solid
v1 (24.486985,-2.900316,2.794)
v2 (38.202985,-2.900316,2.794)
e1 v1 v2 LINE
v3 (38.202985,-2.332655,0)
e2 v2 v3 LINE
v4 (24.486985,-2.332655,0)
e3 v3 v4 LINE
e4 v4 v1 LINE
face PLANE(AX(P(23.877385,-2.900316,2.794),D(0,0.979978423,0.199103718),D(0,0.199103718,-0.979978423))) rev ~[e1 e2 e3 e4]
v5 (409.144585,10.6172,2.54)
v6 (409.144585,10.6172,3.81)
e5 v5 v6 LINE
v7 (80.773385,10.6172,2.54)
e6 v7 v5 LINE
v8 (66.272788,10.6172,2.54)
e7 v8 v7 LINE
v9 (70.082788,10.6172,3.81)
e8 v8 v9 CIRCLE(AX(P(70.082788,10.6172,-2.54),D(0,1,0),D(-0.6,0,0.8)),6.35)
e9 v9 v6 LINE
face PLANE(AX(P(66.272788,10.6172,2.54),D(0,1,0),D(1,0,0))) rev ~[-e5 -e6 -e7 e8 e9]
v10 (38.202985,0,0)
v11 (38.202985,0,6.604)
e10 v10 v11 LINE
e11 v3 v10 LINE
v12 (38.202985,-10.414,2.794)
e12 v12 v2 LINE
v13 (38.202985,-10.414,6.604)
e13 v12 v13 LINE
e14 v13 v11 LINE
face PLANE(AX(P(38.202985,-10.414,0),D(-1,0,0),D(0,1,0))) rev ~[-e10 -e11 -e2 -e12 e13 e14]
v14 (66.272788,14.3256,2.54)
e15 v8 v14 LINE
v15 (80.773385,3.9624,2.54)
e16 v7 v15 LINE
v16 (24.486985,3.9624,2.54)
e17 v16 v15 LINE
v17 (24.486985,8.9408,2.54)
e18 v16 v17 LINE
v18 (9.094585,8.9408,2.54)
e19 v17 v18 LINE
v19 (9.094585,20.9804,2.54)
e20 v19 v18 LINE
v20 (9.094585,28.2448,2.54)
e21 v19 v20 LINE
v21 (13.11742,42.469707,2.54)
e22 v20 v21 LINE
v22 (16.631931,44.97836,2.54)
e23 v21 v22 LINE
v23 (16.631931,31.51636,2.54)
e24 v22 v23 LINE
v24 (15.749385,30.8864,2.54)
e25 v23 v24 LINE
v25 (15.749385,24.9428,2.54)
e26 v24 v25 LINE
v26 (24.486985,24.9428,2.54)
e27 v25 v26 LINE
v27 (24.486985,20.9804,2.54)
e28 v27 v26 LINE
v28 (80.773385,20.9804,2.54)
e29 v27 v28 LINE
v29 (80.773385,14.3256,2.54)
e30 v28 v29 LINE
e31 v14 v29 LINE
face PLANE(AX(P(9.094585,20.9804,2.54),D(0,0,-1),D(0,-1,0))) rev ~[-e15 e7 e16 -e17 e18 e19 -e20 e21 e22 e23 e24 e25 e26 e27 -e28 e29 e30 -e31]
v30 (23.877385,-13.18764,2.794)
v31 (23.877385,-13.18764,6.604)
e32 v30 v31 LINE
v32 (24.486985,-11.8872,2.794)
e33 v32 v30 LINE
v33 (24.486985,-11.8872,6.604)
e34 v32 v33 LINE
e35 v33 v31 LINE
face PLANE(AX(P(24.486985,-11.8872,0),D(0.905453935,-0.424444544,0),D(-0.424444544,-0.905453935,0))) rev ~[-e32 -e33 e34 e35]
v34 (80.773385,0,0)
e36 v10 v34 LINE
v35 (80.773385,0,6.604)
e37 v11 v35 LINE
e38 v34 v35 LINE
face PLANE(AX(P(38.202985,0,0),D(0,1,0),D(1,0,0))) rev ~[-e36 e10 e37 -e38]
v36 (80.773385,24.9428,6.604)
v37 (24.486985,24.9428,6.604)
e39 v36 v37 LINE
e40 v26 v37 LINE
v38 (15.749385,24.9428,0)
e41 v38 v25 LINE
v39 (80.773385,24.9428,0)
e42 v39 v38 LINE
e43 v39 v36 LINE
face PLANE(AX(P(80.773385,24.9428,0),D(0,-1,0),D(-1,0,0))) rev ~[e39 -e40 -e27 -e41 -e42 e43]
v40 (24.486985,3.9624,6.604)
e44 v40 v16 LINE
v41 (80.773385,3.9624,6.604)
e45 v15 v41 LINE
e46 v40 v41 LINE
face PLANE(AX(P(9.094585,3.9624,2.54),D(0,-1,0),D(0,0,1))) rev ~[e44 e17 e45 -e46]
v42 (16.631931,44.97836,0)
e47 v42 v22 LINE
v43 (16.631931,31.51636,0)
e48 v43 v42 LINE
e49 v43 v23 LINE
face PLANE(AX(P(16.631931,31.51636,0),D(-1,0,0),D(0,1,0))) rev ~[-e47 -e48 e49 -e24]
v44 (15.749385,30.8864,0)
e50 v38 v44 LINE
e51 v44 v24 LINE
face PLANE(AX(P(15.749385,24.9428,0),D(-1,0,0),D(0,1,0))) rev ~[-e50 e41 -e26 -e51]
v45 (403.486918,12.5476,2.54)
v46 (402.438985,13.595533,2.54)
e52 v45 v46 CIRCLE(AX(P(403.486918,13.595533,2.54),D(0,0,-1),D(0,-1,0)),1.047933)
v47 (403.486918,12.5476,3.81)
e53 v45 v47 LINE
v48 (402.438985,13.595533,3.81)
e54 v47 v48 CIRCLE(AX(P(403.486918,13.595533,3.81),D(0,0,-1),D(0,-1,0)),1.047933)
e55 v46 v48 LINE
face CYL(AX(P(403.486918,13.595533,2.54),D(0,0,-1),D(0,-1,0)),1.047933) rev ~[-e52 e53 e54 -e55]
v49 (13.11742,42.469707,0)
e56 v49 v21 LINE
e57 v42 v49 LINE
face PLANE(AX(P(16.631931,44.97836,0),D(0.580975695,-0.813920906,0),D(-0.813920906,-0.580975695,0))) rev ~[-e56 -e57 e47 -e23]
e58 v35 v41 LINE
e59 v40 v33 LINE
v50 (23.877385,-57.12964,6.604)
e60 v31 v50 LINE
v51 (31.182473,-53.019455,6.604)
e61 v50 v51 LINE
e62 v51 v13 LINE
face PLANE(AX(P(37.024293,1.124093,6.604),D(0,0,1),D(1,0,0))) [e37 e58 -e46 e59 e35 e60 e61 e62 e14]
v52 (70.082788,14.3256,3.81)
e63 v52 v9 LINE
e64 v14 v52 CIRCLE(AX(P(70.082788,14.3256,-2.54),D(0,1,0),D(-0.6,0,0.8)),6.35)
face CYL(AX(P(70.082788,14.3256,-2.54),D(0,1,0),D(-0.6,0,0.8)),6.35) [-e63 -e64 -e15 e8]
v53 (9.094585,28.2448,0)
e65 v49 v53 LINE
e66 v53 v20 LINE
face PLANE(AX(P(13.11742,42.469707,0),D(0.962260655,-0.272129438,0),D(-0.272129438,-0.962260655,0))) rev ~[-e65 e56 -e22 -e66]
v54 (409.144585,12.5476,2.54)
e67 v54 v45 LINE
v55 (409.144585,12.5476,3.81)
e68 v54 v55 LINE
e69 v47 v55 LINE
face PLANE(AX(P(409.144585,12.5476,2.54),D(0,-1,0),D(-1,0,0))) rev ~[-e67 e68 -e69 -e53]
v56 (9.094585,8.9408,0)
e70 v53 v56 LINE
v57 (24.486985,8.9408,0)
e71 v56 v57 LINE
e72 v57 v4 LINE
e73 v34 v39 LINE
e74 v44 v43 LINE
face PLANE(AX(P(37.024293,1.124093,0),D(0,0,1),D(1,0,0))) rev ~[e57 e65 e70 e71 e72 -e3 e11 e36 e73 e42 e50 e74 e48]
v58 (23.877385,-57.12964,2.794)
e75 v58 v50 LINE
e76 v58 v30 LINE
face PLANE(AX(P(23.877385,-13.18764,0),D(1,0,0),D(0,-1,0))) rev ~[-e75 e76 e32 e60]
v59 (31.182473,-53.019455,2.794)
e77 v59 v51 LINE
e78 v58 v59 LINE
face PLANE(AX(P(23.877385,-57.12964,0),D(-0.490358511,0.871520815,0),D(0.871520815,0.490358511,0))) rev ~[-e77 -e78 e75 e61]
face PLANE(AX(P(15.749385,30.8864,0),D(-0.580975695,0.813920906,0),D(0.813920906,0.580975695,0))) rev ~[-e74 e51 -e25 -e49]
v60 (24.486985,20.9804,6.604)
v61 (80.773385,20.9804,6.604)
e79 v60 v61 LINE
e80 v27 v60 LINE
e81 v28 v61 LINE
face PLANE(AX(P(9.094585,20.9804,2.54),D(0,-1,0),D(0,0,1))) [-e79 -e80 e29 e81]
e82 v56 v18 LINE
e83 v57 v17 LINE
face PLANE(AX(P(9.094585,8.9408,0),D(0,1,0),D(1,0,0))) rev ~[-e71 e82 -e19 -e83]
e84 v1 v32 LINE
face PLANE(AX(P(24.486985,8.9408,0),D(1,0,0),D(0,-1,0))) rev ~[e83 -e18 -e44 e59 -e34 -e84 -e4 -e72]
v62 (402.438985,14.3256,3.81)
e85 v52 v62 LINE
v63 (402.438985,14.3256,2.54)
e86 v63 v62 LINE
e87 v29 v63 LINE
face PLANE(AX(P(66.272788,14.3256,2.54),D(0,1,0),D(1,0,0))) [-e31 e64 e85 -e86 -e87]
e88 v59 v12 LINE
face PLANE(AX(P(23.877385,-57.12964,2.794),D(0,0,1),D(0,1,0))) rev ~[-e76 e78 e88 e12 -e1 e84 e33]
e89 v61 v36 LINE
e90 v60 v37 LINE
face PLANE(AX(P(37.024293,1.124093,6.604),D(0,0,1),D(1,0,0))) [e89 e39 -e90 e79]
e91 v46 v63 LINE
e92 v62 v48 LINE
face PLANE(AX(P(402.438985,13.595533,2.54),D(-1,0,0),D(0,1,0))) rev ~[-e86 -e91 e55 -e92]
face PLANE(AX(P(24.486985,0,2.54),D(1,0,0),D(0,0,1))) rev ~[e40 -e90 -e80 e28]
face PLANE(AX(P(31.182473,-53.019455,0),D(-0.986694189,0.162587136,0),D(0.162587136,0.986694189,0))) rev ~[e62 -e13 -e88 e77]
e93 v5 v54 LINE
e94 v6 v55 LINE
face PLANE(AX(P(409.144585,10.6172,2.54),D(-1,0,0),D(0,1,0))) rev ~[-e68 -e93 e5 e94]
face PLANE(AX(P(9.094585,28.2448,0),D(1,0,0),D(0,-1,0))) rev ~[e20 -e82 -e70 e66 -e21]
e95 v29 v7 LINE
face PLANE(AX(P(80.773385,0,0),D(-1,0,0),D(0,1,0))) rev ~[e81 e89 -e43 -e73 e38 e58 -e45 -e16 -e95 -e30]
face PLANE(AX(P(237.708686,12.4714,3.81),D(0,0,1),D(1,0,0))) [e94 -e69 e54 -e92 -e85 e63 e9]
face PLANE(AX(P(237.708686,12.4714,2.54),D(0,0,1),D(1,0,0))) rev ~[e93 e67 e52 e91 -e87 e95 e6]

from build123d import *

# Parameters (mm, degrees)
F2_DEPTH     = 6.604
F4_W         = 17.018
F4_H         = 5.5950877881
F5_DEPTH     = 71.6798
F6_W         = 16.355678454
F6_H         = 4.3095059386
F7_DEPTH     = 44.9793598678
F9_DEPTH     = 56.897
F10_W        = 342.8717973226
F10_H        = 3.7084
F11_DEPTH    = 1.27
F12_T1_DEPTH = 3.7084
F14_DEPTH    = 4.065


# Not quite as in the source:
# - a fillet or chamfer that OpenCascade refuses, or shapes differently, is made with other operations: its cross-section is extruded or revolved along the edge and cut away or added


with BuildPart() as f2:
    # F1 (on Top) → F2 (new body)
    with BuildSketch(Plane.XY):
        Polygon((80.7733850724, 0), (80.7733850724, 24.9428), (15.7493850724, 24.9428), (15.7493850724, 30.8864), (16.6319306082, 31.5163598678), (16.6319306082, 44.9783598678), (13.1174201358, 42.4697068149), (9.0945850724, 28.2448), (9.0945850724, 8.9408), (24.4869850724, 8.9408), (24.4869850724, -11.8872), (23.8773850724, -13.1876401322), (23.8773850724, -57.1296401322), (31.1824725433, -53.0194550947), (38.2029850724, -10.414), (38.2029850724, 0), align=None)
    extrude(amount=F2_DEPTH)

    # F4 (on face) → F5 (cut, through all)
    with BuildSketch(Plane(origin=(9.0945850724, 0, 0), x_dir=(0, -1, 0), z_dir=(-1, 0, 0))):
        with Locations((-12.4714, 5.3375438941)):
            Rectangle(F4_W, F4_H)
    extrude(amount=-F5_DEPTH, mode=Mode.SUBTRACT)

    # F6 (on Front) → F7 (cut, through all)
    with BuildSketch(Plane.XZ):
        with Locations((16.3091458454, 4.6947529693)):
            Rectangle(F6_W, F6_H)
    extrude(amount=-F7_DEPTH, mode=Mode.SUBTRACT)

    # F8 (on face) → F9 (cut, through all)
    with BuildSketch(Plane(origin=(23.8773850724, 0, 0), x_dir=(0, -1, 0), z_dir=(-1, 0, 0))):
        Polygon((57.1296401322, -1.4798081247), (57.1296401322, 2.794), (2.9003161471, 2.794), (2.032, -1.4798081247), align=None)
    extrude(amount=-F9_DEPTH, mode=Mode.SUBTRACT)

    # F10 (on face) → F11 (join)
    with BuildSketch(Plane.XY.offset(2.54)):
        with Locations((237.7086864111, 12.4714)):
            Rectangle(F10_W, F10_H)
    extrude(amount=F11_DEPTH)

    # F12: fillet of radius 6.35 on 1 edges, made by hand

    # F12_s2 → F12_t1 (cut)
    with BuildSketch(Plane.XZ.offset(-14.3256)):
        with BuildLine():
            ThreePointArc((66.2727877498, 2.54), (68.0747414356, 3.4841389426), (70.0827877498, 3.81))
            Line((70.0827877498, 3.81), (66.2727877498, 3.81))
            Line((66.2727877498, 3.81), (66.2727877498, 2.54))
        make_face()
    extrude(amount=F12_T1_DEPTH, mode=Mode.SUBTRACT)

    # F13 (on face) → F14 (cut, through all)
    with BuildSketch(Plane(origin=(0, 0, 2.54), x_dir=(1, 0, 0), z_dir=(0, 0, -1))):
        with BuildLine():
            ThreePointArc((403.4869184795, -12.5476), (402.7459176611, -12.8545325887), (402.4389850724, -13.5955334071))
            Line((402.4389850724, -13.5955334071), (402.4389850724, -14.3256))
            Line((402.4389850724, -14.3256), (409.480124712, -15.0942075998))
            Line((409.480124712, -15.0942075998), (409.1445850724, -12.5476))
            Line((409.1445850724, -12.5476), (403.4869184795, -12.5476))
        make_face()
    extrude(amount=-F14_DEPTH, mode=Mode.SUBTRACT)


solid = f2.part
